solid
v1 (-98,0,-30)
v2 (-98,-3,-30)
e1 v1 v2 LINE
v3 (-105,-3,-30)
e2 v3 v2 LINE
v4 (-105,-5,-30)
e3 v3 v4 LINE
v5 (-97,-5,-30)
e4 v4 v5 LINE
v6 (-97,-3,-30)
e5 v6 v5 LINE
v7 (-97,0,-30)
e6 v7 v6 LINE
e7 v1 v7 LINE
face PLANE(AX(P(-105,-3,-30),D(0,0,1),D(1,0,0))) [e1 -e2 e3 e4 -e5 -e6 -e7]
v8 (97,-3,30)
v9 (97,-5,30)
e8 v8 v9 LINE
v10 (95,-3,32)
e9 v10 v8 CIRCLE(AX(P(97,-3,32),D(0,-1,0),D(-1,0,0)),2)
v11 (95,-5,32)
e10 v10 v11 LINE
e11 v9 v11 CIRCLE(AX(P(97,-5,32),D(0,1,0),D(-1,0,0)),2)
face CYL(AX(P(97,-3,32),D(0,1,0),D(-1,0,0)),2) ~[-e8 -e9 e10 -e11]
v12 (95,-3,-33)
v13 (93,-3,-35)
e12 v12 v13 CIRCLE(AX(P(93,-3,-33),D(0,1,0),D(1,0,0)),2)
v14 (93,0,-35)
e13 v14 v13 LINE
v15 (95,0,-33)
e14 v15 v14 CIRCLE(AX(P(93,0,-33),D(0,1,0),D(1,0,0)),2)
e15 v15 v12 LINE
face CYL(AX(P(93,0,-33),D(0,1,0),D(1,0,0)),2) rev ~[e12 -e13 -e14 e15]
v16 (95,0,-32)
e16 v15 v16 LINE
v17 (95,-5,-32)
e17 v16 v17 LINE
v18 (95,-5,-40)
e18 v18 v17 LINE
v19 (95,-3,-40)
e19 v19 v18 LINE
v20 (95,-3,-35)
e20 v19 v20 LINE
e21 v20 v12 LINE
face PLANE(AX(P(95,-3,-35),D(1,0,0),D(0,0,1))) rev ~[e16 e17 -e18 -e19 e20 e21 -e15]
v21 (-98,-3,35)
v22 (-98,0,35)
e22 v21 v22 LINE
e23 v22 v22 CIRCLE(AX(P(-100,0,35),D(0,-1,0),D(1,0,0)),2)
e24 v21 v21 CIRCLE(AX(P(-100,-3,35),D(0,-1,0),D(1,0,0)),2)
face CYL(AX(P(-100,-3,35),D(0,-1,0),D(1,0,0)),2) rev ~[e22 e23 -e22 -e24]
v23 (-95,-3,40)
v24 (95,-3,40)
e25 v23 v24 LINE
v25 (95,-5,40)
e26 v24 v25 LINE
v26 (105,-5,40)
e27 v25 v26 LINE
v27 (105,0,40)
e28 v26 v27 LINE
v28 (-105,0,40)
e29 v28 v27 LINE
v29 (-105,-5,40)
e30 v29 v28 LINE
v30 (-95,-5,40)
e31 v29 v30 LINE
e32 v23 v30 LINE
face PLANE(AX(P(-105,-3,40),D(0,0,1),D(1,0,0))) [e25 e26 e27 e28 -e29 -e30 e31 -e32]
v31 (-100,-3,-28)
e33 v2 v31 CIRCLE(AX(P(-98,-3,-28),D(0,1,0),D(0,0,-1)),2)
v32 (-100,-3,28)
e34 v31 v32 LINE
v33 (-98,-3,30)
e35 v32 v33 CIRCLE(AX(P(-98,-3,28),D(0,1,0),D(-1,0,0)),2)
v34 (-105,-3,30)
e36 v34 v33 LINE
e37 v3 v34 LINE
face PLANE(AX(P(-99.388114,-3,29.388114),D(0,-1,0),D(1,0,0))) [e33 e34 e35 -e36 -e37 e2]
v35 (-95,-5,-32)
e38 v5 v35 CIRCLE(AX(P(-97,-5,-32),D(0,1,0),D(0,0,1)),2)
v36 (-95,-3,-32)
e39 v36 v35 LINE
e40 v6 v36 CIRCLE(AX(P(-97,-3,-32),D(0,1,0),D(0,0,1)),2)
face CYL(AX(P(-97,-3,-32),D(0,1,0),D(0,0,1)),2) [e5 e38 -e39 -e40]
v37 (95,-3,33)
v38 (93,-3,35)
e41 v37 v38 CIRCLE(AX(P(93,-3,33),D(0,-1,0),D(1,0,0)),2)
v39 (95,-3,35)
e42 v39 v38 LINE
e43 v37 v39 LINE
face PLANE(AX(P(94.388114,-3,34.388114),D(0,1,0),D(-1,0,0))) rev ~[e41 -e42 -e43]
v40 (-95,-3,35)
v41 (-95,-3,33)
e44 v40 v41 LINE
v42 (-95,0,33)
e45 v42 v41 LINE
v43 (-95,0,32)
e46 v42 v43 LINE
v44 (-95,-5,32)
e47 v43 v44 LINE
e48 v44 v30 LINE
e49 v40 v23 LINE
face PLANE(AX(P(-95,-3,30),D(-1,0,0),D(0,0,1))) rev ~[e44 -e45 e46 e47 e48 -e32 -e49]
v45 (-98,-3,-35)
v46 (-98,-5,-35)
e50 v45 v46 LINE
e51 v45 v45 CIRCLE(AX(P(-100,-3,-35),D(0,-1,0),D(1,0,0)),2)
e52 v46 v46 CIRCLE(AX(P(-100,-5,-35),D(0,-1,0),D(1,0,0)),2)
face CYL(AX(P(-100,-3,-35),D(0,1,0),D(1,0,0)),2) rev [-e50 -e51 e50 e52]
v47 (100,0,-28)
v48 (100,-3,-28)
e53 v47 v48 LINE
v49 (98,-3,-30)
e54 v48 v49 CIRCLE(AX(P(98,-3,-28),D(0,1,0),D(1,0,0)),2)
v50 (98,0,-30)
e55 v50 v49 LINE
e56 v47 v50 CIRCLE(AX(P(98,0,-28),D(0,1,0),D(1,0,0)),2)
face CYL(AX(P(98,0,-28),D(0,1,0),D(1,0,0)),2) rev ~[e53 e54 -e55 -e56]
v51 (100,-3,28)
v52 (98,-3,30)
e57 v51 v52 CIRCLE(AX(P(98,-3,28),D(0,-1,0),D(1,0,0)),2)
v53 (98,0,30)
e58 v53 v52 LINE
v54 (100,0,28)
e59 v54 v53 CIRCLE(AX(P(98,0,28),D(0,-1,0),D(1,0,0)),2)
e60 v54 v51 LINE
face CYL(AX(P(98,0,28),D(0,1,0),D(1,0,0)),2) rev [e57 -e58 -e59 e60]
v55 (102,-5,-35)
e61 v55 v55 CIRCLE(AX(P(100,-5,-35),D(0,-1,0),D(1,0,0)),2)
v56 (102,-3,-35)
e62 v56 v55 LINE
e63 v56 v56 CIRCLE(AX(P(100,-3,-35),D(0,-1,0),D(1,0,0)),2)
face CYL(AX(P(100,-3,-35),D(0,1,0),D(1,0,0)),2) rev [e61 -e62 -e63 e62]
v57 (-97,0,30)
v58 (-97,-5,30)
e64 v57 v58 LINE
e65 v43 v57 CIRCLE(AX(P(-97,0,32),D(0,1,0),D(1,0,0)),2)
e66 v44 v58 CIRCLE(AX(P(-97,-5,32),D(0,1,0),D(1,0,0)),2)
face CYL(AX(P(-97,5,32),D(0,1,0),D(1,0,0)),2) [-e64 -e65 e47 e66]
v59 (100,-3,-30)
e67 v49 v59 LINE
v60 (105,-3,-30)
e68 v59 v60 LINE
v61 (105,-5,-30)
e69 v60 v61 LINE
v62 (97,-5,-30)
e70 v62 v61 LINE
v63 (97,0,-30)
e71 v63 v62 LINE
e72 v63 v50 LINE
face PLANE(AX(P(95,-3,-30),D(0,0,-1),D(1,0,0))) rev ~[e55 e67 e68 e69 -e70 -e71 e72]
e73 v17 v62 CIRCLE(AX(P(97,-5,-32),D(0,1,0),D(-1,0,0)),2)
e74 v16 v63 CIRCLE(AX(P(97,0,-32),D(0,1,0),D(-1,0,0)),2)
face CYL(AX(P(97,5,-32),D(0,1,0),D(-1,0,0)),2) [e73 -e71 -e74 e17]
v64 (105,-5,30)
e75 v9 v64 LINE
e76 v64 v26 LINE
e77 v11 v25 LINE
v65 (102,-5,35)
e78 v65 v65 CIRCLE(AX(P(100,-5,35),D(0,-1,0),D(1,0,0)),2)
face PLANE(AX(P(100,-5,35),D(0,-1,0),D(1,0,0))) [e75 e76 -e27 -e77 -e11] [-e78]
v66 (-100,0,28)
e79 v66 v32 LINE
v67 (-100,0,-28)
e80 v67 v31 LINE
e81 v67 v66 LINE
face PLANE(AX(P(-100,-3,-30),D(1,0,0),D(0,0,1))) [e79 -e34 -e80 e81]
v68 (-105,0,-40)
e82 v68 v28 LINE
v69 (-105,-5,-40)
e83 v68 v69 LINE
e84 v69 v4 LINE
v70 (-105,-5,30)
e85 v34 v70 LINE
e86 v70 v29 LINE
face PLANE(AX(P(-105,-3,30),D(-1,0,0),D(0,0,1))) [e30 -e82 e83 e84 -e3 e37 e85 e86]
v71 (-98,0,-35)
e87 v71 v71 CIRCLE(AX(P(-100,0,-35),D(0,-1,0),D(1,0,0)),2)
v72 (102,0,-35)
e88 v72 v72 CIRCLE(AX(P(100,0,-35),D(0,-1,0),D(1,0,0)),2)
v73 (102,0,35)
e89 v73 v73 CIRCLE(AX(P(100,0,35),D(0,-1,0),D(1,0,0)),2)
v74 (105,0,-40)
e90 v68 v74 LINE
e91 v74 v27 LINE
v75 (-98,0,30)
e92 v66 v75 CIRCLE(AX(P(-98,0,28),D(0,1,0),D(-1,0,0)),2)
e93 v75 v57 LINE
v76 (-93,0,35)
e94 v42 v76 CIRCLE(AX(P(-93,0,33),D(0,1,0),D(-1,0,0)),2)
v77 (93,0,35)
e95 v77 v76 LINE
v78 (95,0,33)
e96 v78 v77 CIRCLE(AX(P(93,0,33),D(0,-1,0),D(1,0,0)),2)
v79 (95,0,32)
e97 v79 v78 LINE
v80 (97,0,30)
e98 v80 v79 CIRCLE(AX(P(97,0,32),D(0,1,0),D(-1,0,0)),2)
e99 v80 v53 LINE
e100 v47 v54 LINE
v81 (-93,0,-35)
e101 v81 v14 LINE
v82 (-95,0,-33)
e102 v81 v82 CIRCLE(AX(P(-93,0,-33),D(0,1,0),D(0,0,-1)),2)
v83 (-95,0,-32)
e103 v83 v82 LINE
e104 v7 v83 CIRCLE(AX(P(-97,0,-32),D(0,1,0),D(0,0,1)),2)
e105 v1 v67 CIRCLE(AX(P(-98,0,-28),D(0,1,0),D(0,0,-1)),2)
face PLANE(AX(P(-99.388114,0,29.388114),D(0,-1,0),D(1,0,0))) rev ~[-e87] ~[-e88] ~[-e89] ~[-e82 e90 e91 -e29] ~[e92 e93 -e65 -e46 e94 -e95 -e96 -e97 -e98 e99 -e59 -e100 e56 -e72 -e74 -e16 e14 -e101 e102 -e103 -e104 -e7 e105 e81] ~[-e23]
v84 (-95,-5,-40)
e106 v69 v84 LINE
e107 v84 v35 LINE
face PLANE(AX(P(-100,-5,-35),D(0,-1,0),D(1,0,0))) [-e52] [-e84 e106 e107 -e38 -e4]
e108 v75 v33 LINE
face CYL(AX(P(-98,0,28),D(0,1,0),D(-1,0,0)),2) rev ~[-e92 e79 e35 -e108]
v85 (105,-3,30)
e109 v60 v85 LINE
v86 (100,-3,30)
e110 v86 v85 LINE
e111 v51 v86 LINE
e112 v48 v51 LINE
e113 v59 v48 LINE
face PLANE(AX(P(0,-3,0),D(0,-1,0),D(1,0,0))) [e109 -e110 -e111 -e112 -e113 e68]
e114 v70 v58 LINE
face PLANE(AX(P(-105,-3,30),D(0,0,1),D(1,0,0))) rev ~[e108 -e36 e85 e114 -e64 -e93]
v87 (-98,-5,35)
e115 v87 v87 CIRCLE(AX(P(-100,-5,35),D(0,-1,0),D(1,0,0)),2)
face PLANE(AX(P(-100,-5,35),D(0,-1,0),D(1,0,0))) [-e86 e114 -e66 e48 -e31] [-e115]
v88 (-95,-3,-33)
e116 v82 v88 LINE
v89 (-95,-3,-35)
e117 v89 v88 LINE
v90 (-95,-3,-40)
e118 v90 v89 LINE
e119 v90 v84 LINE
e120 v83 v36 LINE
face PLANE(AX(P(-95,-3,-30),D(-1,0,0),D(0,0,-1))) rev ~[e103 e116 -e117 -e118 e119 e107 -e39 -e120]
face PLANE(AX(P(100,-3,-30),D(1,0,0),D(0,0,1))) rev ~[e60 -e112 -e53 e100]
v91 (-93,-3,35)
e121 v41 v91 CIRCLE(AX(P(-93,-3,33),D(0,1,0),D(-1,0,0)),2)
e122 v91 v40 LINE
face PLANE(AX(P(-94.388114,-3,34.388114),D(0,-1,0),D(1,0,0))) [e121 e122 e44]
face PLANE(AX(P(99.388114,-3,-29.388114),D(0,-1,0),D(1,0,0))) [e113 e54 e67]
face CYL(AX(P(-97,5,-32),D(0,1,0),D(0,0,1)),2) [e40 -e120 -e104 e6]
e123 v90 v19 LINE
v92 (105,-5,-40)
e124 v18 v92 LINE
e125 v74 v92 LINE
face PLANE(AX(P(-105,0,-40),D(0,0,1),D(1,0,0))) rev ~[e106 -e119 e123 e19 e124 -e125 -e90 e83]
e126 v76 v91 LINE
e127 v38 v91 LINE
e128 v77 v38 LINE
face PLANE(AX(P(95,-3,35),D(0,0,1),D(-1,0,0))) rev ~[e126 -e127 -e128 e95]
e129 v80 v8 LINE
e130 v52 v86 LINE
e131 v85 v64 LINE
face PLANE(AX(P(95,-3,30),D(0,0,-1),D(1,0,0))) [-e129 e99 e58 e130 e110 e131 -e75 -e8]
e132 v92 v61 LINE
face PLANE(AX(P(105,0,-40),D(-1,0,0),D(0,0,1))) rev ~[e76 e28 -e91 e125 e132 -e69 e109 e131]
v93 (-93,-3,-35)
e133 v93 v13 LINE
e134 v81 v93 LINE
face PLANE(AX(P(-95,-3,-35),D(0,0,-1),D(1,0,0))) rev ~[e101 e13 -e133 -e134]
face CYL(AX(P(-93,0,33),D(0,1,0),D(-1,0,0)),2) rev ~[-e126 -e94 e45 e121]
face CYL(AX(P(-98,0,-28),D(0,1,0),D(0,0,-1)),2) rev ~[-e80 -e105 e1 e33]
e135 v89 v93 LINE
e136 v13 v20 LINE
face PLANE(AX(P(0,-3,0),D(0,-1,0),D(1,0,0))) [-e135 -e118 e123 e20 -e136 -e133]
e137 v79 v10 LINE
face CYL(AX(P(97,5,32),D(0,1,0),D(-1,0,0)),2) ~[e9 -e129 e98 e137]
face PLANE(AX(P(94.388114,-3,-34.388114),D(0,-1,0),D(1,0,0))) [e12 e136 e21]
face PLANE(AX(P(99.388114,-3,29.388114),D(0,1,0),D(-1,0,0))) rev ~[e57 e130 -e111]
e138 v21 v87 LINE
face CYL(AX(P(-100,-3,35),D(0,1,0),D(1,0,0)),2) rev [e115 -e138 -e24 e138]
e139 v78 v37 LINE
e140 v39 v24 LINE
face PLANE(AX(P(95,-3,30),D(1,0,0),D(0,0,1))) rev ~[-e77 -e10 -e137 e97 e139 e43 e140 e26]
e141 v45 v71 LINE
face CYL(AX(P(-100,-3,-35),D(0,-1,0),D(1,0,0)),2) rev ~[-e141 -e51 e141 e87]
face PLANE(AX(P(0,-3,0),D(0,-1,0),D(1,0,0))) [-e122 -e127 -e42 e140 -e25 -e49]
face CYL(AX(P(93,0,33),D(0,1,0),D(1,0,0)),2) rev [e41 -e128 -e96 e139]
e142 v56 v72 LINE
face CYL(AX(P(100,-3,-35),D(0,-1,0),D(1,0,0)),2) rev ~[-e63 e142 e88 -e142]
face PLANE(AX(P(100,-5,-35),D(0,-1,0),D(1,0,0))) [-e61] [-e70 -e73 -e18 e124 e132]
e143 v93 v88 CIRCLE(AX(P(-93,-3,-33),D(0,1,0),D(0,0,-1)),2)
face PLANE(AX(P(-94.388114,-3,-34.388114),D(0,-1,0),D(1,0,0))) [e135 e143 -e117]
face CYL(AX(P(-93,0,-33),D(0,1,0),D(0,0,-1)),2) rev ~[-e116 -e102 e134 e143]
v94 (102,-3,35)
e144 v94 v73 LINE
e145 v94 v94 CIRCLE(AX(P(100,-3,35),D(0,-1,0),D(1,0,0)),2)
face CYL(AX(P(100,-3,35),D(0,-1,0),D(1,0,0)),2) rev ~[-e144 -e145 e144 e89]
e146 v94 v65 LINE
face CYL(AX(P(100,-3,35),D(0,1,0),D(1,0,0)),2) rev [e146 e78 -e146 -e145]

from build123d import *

# Parameters (mm, degrees)
F0_W        = 210
F0_H        = 80
F1_DEPTH    = 3
F2_R        = 2
F3_DEPTH    = 25
F4_W        = 10
F4_H        = 10
F4_R        = 2
F5_DEPTH    = 2
F6_W        = 5
F6_H        = 60
F7_DEPTH    = 25
F8_T1_DEPTH = 3
F8_T3_DEPTH = 7
F8_T5_DEPTH = 8
F8_T7_DEPTH = 15


# Not quite as in the source:
# - a fillet or chamfer that OpenCascade refuses, or shapes differently, is made with other operations: its cross-section is extruded or revolved along the edge and cut away or added


with BuildPart() as f1:
    # F0 (on Front) → F1 (new body)
    with BuildSketch(Plane.XZ):
        Rectangle(F0_W, F0_H)
    extrude(amount=F1_DEPTH)

    # F2 (on face) → F3 (cut)
    with BuildSketch(Plane.XZ.offset(3)):
        with Locations((-100.000000149, 35.000000149)):
            Circle(F2_R)
        with Locations((-100.000000149, -35.000000149)):
            Circle(F2_R)
        with Locations((100.000000149, -35.000000149)):
            Circle(F2_R)
        with Locations((100.000000149, 35.000000149)):
            Circle(F2_R)
    extrude(amount=-F3_DEPTH, mode=Mode.SUBTRACT)

    # F4 (on face) → F5 (join)
    with BuildSketch(Plane.XZ.offset(3)):
        with Locations((-100, 35)):
            Rectangle(F4_W, F4_H)
        with Locations((-100.000000149, 35.000000149)):
            Circle(F4_R, mode=Mode.SUBTRACT)
        with Locations((-100, -35)):
            Rectangle(F4_W, F4_H)
        with Locations((-100.000000149, -35.000000149)):
            Circle(F4_R, mode=Mode.SUBTRACT)
        with Locations((100, -35)):
            Rectangle(F4_W, F4_H)
        with Locations((100.000000149, -35.000000149)):
            Circle(F4_R, mode=Mode.SUBTRACT)
        with Locations((100, 35)):
            Rectangle(F4_W, F4_H)
        with Locations((100.000000149, 35.000000149)):
            Circle(F4_R, mode=Mode.SUBTRACT)
    extrude(amount=F5_DEPTH)

    # F6 (on face) → F7 (cut)
    with BuildSketch(Plane.XZ.offset(3)):
        Polygon((95, 35), (-95, 35), (-95, 30), (-95, -30), (-95, -35), (95, -35), (95, -30), (95, 30), align=None)
        with Locations((-97.5, 0)):
            Rectangle(F6_W, F6_H)
        with Locations((97.5, 0)):
            Rectangle(F6_W, F6_H)
    extrude(amount=-F7_DEPTH, mode=Mode.SUBTRACT)

    # F8: fillet of radius 2 on 15 edges, made by hand

    # F8_s2 → F8_t1 (join)
    with BuildSketch(Plane.XZ):
        with BuildLine():
            ThreePointArc((-100, 28), (-99.4142135624, 29.4142135624), (-98, 30))
            Line((-98, 30), (-100, 30))
            Line((-100, 30), (-100, 28))
        make_face()
        with BuildLine():
            ThreePointArc((-95, 33), (-94.4142135624, 34.4142135624), (-93, 35))
            Line((-93, 35), (-95, 35))
            Line((-95, 35), (-95, 33))
        make_face()
        with BuildLine():
            ThreePointArc((-98, -30), (-99.4142135624, -29.4142135624), (-100, -28))
            Line((-100, -28), (-100, -30))
            Line((-100, -30), (-98, -30))
        make_face()
        with BuildLine():
            ThreePointArc((-93, -35), (-94.4142135624, -34.4142135624), (-95, -33))
            Line((-95, -33), (-95, -35))
            Line((-95, -35), (-93, -35))
        make_face()
        with BuildLine():
            ThreePointArc((95, 33), (94.4142135624, 34.4142135624), (93, 35))
            Line((93, 35), (95, 35))
            Line((95, 35), (95, 33))
        make_face()
        with BuildLine():
            ThreePointArc((100, 28), (99.4142135624, 29.4142135624), (98, 30))
            Line((98, 30), (100, 30))
            Line((100, 30), (100, 28))
        make_face()
        with BuildLine():
            ThreePointArc((95, -33), (94.4142135624, -34.4142135624), (93, -35))
            Line((93, -35), (95, -35))
            Line((95, -35), (95, -33))
        make_face()
        with BuildLine():
            ThreePointArc((100, -28), (99.4142135624, -29.4142135624), (98, -30))
            Line((98, -30), (100, -30))
            Line((100, -30), (100, -28))
        make_face()
    extrude(amount=F8_T1_DEPTH)

    # F8_s4 → F8_t3 (cut)
    with BuildSketch(Plane.XZ.offset(3)):
        with BuildLine():
            ThreePointArc((-95, 32), (-95.5857864376, 30.5857864376), (-97, 30))
            Line((-97, 30), (-95, 30))
            Line((-95, 30), (-95, 32))
        make_face()
        with BuildLine():
            ThreePointArc((-97, -30), (-95.5857864376, -30.5857864376), (-95, -32))
            Line((-95, -32), (-95, -30))
            Line((-95, -30), (-97, -30))
        make_face()
        with BuildLine():
            ThreePointArc((95, 32), (95.5857864376, 30.5857864376), (97, 30))
            Line((97, 30), (95, 30))
            Line((95, 30), (95, 32))
        make_face()
    extrude(amount=F8_T3_DEPTH, mode=Mode.SUBTRACT)

    # F8_s6 → F8_t5 (cut)
    with BuildSketch(Plane.XZ.offset(-5)):
        with BuildLine():
            ThreePointArc((-95, 32), (-95.5857864376, 30.5857864376), (-97, 30))
            Line((-97, 30), (-95, 30))
            Line((-95, 30), (-95, 32))
        make_face()
        with BuildLine():
            ThreePointArc((-97, -30), (-95.5857864376, -30.5857864376), (-95, -32))
            Line((-95, -32), (-95, -30))
            Line((-95, -30), (-97, -30))
        make_face()
        with BuildLine():
            ThreePointArc((95, 32), (95.5857864376, 30.5857864376), (97, 30))
            Line((97, 30), (95, 30))
            Line((95, 30), (95, 32))
        make_face()
    extrude(amount=F8_T5_DEPTH, mode=Mode.SUBTRACT)

    # F8_s8 → F8_t7 (cut)
    with BuildSketch(Plane.XZ.offset(-5)):
        with BuildLine():
            ThreePointArc((95, -32), (95.5857864376, -30.5857864376), (97, -30))
            Line((97, -30), (95, -30))
            Line((95, -30), (95, -32))
        make_face()
    extrude(amount=F8_T7_DEPTH, mode=Mode.SUBTRACT)


solid = f1.part
